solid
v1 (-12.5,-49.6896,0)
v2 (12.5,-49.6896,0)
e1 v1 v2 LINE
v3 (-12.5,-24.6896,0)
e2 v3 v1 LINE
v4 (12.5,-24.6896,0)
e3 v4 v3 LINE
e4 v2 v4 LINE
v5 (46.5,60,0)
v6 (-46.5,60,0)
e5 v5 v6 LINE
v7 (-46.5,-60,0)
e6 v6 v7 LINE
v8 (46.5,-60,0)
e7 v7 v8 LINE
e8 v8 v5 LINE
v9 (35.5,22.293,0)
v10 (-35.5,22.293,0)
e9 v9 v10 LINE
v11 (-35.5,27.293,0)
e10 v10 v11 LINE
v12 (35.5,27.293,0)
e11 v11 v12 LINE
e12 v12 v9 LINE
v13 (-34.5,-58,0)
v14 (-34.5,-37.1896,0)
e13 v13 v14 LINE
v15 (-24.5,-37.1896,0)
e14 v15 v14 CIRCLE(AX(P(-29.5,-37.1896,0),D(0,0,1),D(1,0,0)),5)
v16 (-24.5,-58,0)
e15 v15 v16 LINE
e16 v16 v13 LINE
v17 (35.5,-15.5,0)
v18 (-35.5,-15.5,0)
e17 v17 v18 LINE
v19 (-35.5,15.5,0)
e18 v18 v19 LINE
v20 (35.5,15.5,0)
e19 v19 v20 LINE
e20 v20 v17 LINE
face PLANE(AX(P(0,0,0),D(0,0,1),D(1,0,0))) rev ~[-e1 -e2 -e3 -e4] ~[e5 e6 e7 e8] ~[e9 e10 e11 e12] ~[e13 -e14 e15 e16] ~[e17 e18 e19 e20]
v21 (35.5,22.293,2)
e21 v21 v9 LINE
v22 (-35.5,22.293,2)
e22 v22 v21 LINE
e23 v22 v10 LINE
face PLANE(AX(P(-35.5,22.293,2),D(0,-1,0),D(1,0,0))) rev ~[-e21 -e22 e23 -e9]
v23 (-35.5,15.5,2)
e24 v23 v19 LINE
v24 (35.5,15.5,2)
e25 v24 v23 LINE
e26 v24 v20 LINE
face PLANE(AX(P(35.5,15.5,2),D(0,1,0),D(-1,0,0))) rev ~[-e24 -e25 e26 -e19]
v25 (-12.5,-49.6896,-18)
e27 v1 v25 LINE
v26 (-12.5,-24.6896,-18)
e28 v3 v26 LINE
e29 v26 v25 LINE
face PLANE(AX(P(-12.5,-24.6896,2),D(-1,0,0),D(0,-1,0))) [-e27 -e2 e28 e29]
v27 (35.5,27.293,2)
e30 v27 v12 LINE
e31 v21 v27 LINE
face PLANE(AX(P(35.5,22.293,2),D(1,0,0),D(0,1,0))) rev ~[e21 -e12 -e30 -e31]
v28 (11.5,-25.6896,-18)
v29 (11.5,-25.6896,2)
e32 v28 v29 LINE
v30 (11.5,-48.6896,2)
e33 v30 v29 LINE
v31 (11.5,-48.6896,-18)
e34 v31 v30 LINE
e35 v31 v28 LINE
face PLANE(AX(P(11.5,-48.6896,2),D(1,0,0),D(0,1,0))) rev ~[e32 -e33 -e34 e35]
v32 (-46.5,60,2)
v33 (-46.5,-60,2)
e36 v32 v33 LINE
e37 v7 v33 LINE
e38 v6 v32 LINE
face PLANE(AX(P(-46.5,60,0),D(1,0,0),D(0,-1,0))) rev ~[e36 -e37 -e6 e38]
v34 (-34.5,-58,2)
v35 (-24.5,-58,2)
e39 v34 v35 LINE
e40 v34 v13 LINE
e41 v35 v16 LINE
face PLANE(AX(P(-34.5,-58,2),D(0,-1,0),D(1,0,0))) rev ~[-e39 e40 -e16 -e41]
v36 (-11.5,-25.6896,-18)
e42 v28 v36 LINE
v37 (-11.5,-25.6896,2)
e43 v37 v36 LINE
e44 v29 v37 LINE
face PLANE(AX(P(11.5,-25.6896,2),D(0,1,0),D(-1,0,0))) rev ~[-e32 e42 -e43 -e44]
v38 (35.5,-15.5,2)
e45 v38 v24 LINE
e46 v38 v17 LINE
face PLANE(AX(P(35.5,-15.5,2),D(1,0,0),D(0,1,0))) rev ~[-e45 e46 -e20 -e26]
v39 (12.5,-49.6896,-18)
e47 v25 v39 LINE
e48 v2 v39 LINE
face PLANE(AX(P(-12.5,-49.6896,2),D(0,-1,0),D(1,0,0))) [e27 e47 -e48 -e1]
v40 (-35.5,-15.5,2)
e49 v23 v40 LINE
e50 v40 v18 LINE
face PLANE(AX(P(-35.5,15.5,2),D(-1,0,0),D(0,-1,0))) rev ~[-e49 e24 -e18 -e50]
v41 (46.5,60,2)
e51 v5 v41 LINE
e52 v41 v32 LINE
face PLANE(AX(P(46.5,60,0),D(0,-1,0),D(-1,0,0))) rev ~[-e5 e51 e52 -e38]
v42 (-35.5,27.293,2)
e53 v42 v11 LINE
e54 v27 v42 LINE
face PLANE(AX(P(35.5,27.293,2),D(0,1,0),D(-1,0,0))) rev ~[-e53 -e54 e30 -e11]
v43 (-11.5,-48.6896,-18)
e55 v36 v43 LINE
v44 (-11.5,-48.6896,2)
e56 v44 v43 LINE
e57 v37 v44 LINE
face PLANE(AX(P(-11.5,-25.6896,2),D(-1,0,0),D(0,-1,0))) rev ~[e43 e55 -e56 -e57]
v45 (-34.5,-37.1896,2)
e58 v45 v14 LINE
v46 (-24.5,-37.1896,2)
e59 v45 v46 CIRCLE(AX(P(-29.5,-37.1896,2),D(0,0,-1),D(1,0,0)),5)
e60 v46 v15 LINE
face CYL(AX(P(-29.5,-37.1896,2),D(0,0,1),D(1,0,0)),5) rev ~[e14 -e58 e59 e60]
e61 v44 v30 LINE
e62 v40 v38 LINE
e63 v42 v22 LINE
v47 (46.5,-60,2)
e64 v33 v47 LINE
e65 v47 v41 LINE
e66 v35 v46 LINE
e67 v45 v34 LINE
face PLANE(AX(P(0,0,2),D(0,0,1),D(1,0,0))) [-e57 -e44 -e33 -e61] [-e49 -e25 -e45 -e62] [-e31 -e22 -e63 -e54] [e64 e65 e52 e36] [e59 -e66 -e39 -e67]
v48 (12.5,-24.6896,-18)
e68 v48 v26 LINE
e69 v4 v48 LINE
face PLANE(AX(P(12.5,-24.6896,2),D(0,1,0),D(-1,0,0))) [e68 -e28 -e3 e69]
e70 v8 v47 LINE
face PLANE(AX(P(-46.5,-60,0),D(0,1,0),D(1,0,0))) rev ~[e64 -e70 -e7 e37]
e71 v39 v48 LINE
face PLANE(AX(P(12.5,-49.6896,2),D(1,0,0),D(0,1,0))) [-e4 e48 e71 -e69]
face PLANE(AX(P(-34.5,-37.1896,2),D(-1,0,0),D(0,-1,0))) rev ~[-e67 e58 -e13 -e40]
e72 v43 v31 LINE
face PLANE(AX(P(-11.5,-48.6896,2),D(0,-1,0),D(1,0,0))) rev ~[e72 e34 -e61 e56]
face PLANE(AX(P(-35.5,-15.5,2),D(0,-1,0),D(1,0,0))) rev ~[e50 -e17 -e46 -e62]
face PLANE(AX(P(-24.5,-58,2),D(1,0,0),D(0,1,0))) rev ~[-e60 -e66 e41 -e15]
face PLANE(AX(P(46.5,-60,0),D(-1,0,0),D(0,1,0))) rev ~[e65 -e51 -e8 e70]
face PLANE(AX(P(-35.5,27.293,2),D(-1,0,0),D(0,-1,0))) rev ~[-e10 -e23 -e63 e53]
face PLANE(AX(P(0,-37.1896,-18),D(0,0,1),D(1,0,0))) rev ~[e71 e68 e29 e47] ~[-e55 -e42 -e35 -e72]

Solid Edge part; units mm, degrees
sketch "Sketch1" plane through (0, 0, 0) normal (0, 0, 1) x (1, 0, 0)
  line L0 (-46.5, -60) -> (46.5, -60)
  line L1 (46.5, -60) -> (46.5, 60)
  line L2 (46.5, 60) -> (-46.5, 60)
  line L3 (-46.5, 60) -> (-46.5, -60)
extrude "Protrusion1" add sketch "Sketch1" along normal blind 2
sketch "Sketch2" plane through (0, 0, 2) normal (0, 0, 1) x (1, 0, 0)
  line L0 (-35.5, -15.5) -> (35.5, -15.5)
  line L1 (35.5, -15.5) -> (35.5, 15.5)
  line L2 (35.5, 15.5) -> (-35.5, 15.5)
  line L3 (-35.5, 15.5) -> (-35.5, -15.5)
extrude "Cutout1" cut sketch "Sketch2" against normal up to next
sketch "Sketch3" plane through (0, 0, 2) normal (0, 0, 1) x (1, 0, 0)
  line L0 (-35.5, 22.293) -> (35.5, 22.293)
  line L1 (35.5, 22.293) -> (35.5, 27.293)
  line L2 (35.5, 27.293) -> (-35.5, 27.293)
  line L3 (-35.5, 27.293) -> (-35.5, 22.293)
extrude "Cutout2" cut sketch "Sketch3" against normal up to next
sketch "Sketch4" plane through (0, 0, 2) normal (0, 0, 1) x (1, 0, 0)
  line L0 (11.5, -25.6896) -> (-11.5, -25.6896)
  line L1 (-11.5, -25.6896) -> (-11.5, -48.6896)
  line L2 (-11.5, -48.6896) -> (11.5, -48.6896)
  line L3 (11.5, -48.6896) -> (11.5, -25.6896)
extrude "Cutout3" cut sketch "Sketch4" against normal up to next
sketch "Sketch5" plane through (0, 0, 2) normal (0, 0, 1) x (1, 0, 0)
  line L0 (-12.5, -24.6896) -> (-12.5, -49.6896)
  line L1 (-12.5, -49.6896) -> (12.5, -49.6896)
  line L2 (12.5, -49.6896) -> (12.5, -24.6896)
  line L3 (12.5, -24.6896) -> (-12.5, -24.6896)
  line L4 (-11.5, -25.6896) -> (-11.5, -48.6896)
  line L5 (-11.5, -48.6896) -> (11.5, -48.6896)
  line L6 (11.5, -48.6896) -> (11.5, -25.6896)
  line L7 (11.5, -25.6896) -> (-11.5, -25.6896)
extrude "Protrusion2" add sketch "Sketch5" against normal blind 20
sketch "Sketch6" plane through (0, 0, 2) normal (0, 0, 1) x (1, 0, 0)
  arc A0 (-34.5, -37.1896) -> (-24.5, -37.1896) centre (-29.5, -37.1896) cw
  line L0 (-34.5, -37.1896) -> (-34.5, -58)
  line L1 (-24.5, -58) -> (-24.5, -37.1896)
  line L2 (-34.5, -58) -> (-24.5, -58)
extrude "Cutout4" cut sketch "Sketch6" against normal up to next
